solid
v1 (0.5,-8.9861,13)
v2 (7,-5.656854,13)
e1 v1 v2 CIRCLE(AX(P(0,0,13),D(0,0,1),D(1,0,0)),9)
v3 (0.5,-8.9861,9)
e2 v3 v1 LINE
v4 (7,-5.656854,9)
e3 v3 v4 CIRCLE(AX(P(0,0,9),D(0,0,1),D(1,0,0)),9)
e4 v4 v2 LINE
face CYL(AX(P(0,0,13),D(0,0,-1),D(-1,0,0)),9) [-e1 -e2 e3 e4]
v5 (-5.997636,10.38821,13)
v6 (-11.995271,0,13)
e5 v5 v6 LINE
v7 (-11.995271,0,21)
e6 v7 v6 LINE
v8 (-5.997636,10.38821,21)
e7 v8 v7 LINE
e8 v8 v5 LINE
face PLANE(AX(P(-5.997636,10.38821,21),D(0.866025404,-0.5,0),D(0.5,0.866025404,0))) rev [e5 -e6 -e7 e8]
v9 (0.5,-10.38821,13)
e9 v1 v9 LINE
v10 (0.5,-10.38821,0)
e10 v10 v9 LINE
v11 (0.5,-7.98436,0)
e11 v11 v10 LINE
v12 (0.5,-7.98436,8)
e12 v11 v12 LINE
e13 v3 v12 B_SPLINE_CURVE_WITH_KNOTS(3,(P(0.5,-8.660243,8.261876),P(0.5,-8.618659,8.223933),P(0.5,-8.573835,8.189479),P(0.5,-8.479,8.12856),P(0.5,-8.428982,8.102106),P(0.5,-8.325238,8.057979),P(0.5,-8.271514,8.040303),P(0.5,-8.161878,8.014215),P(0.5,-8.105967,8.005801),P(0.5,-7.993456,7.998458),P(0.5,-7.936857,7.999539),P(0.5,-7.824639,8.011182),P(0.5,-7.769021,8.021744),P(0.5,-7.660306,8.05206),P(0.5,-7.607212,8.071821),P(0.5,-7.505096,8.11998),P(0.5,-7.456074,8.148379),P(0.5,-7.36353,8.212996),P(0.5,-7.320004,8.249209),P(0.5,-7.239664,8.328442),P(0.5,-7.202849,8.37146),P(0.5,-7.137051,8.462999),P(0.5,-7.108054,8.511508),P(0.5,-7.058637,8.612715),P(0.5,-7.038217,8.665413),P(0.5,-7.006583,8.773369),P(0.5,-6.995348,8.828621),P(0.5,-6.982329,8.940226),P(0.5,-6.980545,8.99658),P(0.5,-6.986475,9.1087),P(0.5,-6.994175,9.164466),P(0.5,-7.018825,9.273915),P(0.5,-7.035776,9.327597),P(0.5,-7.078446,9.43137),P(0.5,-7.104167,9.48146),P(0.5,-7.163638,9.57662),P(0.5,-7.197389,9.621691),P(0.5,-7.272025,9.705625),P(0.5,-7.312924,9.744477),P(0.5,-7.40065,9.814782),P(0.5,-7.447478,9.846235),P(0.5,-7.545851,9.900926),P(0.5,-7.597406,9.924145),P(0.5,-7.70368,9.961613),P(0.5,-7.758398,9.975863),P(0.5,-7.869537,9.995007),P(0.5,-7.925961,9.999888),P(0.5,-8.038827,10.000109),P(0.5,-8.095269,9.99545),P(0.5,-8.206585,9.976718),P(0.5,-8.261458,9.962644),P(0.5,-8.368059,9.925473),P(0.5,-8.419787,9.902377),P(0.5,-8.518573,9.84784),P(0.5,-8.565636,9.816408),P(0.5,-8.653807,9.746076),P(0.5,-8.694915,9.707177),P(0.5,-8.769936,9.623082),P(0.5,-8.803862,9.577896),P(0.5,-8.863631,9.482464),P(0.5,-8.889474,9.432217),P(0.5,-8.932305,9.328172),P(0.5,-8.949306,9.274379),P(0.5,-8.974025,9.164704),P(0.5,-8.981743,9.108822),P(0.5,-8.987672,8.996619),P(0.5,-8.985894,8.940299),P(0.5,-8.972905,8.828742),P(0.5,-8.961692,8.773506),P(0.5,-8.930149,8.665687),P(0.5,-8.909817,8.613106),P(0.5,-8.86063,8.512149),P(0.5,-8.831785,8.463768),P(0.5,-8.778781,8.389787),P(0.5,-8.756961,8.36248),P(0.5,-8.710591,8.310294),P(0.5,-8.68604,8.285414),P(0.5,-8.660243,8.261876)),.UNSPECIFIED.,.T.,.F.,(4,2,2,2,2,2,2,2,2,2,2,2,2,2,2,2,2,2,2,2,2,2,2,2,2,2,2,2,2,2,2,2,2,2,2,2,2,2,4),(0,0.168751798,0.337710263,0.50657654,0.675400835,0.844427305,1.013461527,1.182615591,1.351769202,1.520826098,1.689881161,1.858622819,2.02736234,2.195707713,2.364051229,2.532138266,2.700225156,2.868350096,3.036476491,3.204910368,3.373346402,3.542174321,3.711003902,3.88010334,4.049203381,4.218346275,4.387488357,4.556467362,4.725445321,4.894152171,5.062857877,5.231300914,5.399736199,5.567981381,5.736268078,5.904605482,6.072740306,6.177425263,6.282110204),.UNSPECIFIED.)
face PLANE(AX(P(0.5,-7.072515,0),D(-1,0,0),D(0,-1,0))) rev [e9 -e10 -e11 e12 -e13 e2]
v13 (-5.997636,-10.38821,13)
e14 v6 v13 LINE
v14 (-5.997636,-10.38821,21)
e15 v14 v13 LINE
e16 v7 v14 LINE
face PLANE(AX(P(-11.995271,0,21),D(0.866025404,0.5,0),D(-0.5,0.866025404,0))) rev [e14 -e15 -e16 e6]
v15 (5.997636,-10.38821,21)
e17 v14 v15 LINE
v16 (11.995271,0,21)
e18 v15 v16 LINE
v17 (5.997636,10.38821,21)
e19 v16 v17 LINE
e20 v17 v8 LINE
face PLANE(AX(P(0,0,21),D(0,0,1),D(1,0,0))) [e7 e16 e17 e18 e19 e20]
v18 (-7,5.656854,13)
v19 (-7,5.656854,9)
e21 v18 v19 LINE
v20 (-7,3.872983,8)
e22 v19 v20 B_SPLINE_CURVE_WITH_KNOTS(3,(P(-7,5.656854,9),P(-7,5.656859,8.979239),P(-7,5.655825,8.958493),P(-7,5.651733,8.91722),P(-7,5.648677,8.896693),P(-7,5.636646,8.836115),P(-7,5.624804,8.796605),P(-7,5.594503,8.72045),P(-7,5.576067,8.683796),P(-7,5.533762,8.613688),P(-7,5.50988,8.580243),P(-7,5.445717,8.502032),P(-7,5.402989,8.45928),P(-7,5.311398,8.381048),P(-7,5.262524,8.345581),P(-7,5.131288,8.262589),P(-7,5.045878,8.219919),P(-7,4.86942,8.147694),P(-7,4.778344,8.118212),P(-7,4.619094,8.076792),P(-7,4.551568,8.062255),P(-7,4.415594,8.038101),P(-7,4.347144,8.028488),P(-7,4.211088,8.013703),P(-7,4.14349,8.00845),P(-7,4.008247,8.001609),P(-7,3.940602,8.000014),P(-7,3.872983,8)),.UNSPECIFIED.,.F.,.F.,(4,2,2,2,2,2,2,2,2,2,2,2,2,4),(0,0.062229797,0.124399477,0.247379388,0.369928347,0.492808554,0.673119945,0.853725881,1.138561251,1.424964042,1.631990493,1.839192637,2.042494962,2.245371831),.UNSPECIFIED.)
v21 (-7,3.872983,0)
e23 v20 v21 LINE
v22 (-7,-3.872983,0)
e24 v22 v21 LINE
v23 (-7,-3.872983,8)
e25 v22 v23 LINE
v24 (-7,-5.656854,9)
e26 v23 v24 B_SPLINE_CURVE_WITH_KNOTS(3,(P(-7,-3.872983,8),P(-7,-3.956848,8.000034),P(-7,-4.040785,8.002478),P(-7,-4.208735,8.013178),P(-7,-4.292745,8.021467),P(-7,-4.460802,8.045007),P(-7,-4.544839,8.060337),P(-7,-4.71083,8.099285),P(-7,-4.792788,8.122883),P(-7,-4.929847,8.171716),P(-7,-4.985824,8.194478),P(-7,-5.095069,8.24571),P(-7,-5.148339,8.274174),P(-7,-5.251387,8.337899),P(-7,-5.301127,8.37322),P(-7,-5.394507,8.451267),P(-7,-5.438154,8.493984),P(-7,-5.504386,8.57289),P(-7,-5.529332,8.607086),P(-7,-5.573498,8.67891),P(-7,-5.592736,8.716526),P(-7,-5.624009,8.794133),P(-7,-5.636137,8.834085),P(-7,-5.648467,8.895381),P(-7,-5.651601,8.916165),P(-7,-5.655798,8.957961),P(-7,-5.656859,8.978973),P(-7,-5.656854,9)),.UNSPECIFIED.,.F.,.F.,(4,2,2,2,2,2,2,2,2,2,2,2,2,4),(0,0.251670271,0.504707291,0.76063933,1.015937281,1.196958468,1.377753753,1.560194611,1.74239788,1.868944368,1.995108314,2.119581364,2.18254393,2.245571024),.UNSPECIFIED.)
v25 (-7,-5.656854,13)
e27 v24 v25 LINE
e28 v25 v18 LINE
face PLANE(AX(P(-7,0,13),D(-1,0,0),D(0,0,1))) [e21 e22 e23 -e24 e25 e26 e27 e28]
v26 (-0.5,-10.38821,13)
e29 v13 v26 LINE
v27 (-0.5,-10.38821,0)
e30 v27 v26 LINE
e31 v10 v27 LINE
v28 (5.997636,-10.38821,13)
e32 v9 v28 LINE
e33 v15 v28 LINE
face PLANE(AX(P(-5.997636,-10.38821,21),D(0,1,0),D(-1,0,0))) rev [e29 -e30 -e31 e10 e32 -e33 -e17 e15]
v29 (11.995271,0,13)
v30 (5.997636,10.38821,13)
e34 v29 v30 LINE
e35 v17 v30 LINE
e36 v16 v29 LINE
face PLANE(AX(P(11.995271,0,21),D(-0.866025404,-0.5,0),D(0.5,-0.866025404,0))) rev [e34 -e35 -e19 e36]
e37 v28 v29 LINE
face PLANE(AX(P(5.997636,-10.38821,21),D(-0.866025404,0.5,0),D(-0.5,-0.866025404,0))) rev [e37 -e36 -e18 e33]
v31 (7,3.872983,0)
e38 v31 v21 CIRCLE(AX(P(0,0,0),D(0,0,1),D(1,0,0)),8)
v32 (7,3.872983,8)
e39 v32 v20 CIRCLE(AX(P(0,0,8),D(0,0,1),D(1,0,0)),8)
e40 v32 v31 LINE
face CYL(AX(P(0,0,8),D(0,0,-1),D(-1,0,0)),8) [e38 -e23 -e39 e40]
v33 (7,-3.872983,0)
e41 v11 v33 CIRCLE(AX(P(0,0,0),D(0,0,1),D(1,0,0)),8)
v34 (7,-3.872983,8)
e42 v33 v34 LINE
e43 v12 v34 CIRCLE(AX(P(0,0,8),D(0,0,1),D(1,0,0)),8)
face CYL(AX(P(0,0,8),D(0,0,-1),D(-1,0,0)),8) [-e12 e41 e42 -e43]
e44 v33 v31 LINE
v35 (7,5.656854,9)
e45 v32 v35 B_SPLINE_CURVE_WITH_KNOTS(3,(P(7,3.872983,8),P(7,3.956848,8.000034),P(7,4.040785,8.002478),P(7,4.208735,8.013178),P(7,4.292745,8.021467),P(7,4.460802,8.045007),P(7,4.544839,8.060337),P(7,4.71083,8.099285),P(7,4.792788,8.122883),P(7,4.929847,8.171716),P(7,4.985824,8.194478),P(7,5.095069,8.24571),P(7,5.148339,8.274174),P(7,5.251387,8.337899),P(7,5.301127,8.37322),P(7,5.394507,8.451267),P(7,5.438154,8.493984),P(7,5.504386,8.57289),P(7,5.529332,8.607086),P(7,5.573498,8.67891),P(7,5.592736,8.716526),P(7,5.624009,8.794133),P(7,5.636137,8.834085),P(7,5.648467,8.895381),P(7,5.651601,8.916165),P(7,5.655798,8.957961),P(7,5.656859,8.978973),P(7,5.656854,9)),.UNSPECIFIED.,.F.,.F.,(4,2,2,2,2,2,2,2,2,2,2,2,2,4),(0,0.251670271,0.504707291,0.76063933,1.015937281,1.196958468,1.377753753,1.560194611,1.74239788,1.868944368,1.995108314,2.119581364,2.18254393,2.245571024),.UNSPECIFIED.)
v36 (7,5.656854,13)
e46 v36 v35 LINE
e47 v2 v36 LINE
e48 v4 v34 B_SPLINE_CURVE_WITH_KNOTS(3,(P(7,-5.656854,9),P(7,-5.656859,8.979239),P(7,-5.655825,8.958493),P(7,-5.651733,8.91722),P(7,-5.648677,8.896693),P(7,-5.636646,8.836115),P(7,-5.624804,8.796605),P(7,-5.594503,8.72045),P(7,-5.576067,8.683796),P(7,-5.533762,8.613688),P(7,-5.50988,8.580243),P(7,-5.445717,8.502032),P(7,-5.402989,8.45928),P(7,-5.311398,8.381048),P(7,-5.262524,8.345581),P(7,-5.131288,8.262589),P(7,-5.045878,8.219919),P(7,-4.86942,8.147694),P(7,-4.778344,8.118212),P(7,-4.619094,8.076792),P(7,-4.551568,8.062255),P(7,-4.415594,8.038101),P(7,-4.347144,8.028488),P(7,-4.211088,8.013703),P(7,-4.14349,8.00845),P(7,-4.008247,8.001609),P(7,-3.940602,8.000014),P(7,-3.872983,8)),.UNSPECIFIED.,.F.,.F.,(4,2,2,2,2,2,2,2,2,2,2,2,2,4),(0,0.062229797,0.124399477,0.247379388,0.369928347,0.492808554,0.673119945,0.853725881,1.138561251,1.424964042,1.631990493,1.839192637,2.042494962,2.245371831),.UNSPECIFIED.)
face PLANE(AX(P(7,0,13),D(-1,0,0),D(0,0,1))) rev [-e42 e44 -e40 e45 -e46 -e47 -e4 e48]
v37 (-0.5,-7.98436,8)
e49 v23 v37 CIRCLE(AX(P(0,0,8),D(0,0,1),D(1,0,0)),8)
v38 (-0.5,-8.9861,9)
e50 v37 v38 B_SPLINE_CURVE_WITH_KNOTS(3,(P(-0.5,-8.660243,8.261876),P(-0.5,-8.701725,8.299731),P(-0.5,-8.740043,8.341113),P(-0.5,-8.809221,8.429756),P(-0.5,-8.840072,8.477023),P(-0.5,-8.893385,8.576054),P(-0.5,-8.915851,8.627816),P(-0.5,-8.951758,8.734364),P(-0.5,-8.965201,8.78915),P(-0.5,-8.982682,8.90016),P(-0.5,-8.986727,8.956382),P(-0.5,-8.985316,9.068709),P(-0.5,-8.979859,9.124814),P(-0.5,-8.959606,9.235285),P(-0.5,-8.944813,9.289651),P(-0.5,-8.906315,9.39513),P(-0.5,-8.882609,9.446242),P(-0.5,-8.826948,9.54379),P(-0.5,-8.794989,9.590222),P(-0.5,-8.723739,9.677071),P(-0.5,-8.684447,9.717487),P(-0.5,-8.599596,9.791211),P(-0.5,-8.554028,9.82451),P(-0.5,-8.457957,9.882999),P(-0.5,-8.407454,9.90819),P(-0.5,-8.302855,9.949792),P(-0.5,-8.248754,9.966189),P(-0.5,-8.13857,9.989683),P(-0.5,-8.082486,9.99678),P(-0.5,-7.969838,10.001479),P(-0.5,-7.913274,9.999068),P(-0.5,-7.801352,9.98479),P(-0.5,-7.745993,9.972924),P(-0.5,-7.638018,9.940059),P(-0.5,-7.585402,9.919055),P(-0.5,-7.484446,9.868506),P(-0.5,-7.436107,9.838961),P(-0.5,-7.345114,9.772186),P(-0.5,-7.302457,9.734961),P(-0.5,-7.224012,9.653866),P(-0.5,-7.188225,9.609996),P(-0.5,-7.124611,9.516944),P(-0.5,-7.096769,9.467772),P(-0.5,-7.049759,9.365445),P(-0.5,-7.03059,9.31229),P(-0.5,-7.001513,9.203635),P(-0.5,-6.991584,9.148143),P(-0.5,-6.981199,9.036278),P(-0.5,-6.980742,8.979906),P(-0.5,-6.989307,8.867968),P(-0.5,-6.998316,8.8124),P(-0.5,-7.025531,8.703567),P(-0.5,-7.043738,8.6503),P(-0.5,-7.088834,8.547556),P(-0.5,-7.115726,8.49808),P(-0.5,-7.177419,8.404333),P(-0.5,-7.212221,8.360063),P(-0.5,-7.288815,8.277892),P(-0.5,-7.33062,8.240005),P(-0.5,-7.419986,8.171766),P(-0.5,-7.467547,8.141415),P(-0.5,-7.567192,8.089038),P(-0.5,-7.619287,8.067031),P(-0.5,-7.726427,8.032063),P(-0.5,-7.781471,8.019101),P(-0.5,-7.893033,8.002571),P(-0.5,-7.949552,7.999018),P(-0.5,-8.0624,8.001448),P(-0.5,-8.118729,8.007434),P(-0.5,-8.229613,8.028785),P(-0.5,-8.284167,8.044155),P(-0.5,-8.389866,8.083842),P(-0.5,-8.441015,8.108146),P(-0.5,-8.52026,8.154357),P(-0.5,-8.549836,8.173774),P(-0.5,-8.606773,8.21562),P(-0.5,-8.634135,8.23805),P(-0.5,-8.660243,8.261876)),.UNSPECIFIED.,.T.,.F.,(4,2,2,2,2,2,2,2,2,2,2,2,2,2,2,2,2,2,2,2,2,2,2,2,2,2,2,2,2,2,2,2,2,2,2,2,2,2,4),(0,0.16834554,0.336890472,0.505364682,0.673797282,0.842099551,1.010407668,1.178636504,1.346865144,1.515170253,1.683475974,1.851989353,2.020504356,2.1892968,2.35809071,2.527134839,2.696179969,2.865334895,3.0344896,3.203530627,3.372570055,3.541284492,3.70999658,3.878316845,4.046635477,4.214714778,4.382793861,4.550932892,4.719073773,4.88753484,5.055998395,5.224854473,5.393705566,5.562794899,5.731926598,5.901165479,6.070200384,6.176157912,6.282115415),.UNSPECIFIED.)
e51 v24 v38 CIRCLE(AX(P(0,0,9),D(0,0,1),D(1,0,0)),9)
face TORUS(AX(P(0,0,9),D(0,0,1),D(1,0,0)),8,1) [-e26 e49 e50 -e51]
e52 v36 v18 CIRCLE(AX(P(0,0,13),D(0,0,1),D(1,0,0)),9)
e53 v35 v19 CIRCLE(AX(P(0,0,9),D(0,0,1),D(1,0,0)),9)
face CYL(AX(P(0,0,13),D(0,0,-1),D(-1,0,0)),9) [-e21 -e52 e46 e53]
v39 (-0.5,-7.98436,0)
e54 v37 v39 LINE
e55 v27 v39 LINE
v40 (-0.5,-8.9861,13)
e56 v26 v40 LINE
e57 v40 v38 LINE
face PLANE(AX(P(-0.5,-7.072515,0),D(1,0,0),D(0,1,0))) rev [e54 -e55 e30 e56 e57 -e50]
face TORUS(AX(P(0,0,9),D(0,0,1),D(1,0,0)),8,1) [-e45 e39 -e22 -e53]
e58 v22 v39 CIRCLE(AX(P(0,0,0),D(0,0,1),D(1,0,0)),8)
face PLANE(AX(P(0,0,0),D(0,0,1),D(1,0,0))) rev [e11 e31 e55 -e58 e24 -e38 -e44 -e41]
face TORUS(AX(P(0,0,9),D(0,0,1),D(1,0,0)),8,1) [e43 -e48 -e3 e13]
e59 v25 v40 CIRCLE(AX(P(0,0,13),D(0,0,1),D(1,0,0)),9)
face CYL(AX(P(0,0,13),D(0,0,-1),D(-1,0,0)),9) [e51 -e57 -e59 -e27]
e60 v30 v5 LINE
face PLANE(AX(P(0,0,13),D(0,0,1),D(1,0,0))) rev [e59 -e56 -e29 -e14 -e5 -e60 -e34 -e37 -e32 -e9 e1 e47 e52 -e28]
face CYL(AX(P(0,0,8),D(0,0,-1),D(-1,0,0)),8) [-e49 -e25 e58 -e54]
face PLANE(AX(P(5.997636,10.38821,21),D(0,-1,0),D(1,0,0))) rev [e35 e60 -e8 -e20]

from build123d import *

# Parameters (mm, degrees)
SKIZZE1_R                       = 8
AUFSATZ_LINEAR_AUSTRAGEN1_DEPTH = 8
SKIZZE2_R                       = 9
AUFSATZ_LINEAR_AUSTRAGEN2_DEPTH = 5
AUFSATZ_LINEAR_AUSTRAGEN3_DEPTH = 8
SKIZZE4_W                       = 3
SKIZZE4_H                       = 19.049807725
SCHNITT_LINEAR_AUSTRAGEN1_DEPTH = 13
VERRUNDUNG1_R                   = 1
SKIZZE5_W                       = 1
SKIZZE5_H                       = 3.315694734
AUFSATZ_LINEAR_AUSTRAGEN4_DEPTH = 13


with BuildPart() as part:
    # Skizze1 → Aufsatz-Linear austragen1 (new body)
    with BuildSketch(Plane.XY):
        Circle(SKIZZE1_R)
    extrude(amount=AUFSATZ_LINEAR_AUSTRAGEN1_DEPTH)

    # Skizze2 → Aufsatz-Linear austragen2 (add)
    with BuildSketch(Plane.XY.offset(8)):
        Circle(SKIZZE2_R)
    extrude(amount=AUFSATZ_LINEAR_AUSTRAGEN2_DEPTH)

    # Skizze3 → Aufsatz-Linear austragen3 (add)
    with BuildSketch(Plane.XY.offset(13)):
        Polygon((11.995271167, 0), (5.997635583, 10.388209556), (-5.997635583, 10.388209556), (-11.995271167, 0), (-5.997635583, -10.388209556), (5.997635583, -10.388209556), align=None)
    extrude(amount=AUFSATZ_LINEAR_AUSTRAGEN3_DEPTH)

    # Skizze4 → Schnitt-Linear austragen1 (cut)
    with BuildSketch(Plane(origin=(0, 0, 0), x_dir=(-1, 0, 0), z_dir=(0, 0, -1))):
        with Locations((-8.5, -0.043792661)):
            Rectangle(SKIZZE4_W, SKIZZE4_H)
        with Locations((8.5, -0.043792661)):
            Rectangle(SKIZZE4_W, SKIZZE4_H)
    extrude(amount=-SCHNITT_LINEAR_AUSTRAGEN1_DEPTH, mode=Mode.SUBTRACT)

    # Verrundung1
    verrundung1_edges = [part.edges().sort_by_distance(p)[0] for p in [
        (0, -9, 8),
        (0, 9, 8),
    ]]
    fillet(verrundung1_edges, radius=VERRUNDUNG1_R - 0.0001)  # a hair under: the kernel refuses the full size

    # Skizze5 → Aufsatz-Linear austragen4 (add)
    with BuildSketch(Plane(origin=(0, 0, 13), x_dir=(-1, 0, 0), z_dir=(0, 0, -1))):
        with Locations((0, -8.730362189)):
            Rectangle(SKIZZE5_W, SKIZZE5_H)
    extrude(amount=AUFSATZ_LINEAR_AUSTRAGEN4_DEPTH)


solid = part.part
